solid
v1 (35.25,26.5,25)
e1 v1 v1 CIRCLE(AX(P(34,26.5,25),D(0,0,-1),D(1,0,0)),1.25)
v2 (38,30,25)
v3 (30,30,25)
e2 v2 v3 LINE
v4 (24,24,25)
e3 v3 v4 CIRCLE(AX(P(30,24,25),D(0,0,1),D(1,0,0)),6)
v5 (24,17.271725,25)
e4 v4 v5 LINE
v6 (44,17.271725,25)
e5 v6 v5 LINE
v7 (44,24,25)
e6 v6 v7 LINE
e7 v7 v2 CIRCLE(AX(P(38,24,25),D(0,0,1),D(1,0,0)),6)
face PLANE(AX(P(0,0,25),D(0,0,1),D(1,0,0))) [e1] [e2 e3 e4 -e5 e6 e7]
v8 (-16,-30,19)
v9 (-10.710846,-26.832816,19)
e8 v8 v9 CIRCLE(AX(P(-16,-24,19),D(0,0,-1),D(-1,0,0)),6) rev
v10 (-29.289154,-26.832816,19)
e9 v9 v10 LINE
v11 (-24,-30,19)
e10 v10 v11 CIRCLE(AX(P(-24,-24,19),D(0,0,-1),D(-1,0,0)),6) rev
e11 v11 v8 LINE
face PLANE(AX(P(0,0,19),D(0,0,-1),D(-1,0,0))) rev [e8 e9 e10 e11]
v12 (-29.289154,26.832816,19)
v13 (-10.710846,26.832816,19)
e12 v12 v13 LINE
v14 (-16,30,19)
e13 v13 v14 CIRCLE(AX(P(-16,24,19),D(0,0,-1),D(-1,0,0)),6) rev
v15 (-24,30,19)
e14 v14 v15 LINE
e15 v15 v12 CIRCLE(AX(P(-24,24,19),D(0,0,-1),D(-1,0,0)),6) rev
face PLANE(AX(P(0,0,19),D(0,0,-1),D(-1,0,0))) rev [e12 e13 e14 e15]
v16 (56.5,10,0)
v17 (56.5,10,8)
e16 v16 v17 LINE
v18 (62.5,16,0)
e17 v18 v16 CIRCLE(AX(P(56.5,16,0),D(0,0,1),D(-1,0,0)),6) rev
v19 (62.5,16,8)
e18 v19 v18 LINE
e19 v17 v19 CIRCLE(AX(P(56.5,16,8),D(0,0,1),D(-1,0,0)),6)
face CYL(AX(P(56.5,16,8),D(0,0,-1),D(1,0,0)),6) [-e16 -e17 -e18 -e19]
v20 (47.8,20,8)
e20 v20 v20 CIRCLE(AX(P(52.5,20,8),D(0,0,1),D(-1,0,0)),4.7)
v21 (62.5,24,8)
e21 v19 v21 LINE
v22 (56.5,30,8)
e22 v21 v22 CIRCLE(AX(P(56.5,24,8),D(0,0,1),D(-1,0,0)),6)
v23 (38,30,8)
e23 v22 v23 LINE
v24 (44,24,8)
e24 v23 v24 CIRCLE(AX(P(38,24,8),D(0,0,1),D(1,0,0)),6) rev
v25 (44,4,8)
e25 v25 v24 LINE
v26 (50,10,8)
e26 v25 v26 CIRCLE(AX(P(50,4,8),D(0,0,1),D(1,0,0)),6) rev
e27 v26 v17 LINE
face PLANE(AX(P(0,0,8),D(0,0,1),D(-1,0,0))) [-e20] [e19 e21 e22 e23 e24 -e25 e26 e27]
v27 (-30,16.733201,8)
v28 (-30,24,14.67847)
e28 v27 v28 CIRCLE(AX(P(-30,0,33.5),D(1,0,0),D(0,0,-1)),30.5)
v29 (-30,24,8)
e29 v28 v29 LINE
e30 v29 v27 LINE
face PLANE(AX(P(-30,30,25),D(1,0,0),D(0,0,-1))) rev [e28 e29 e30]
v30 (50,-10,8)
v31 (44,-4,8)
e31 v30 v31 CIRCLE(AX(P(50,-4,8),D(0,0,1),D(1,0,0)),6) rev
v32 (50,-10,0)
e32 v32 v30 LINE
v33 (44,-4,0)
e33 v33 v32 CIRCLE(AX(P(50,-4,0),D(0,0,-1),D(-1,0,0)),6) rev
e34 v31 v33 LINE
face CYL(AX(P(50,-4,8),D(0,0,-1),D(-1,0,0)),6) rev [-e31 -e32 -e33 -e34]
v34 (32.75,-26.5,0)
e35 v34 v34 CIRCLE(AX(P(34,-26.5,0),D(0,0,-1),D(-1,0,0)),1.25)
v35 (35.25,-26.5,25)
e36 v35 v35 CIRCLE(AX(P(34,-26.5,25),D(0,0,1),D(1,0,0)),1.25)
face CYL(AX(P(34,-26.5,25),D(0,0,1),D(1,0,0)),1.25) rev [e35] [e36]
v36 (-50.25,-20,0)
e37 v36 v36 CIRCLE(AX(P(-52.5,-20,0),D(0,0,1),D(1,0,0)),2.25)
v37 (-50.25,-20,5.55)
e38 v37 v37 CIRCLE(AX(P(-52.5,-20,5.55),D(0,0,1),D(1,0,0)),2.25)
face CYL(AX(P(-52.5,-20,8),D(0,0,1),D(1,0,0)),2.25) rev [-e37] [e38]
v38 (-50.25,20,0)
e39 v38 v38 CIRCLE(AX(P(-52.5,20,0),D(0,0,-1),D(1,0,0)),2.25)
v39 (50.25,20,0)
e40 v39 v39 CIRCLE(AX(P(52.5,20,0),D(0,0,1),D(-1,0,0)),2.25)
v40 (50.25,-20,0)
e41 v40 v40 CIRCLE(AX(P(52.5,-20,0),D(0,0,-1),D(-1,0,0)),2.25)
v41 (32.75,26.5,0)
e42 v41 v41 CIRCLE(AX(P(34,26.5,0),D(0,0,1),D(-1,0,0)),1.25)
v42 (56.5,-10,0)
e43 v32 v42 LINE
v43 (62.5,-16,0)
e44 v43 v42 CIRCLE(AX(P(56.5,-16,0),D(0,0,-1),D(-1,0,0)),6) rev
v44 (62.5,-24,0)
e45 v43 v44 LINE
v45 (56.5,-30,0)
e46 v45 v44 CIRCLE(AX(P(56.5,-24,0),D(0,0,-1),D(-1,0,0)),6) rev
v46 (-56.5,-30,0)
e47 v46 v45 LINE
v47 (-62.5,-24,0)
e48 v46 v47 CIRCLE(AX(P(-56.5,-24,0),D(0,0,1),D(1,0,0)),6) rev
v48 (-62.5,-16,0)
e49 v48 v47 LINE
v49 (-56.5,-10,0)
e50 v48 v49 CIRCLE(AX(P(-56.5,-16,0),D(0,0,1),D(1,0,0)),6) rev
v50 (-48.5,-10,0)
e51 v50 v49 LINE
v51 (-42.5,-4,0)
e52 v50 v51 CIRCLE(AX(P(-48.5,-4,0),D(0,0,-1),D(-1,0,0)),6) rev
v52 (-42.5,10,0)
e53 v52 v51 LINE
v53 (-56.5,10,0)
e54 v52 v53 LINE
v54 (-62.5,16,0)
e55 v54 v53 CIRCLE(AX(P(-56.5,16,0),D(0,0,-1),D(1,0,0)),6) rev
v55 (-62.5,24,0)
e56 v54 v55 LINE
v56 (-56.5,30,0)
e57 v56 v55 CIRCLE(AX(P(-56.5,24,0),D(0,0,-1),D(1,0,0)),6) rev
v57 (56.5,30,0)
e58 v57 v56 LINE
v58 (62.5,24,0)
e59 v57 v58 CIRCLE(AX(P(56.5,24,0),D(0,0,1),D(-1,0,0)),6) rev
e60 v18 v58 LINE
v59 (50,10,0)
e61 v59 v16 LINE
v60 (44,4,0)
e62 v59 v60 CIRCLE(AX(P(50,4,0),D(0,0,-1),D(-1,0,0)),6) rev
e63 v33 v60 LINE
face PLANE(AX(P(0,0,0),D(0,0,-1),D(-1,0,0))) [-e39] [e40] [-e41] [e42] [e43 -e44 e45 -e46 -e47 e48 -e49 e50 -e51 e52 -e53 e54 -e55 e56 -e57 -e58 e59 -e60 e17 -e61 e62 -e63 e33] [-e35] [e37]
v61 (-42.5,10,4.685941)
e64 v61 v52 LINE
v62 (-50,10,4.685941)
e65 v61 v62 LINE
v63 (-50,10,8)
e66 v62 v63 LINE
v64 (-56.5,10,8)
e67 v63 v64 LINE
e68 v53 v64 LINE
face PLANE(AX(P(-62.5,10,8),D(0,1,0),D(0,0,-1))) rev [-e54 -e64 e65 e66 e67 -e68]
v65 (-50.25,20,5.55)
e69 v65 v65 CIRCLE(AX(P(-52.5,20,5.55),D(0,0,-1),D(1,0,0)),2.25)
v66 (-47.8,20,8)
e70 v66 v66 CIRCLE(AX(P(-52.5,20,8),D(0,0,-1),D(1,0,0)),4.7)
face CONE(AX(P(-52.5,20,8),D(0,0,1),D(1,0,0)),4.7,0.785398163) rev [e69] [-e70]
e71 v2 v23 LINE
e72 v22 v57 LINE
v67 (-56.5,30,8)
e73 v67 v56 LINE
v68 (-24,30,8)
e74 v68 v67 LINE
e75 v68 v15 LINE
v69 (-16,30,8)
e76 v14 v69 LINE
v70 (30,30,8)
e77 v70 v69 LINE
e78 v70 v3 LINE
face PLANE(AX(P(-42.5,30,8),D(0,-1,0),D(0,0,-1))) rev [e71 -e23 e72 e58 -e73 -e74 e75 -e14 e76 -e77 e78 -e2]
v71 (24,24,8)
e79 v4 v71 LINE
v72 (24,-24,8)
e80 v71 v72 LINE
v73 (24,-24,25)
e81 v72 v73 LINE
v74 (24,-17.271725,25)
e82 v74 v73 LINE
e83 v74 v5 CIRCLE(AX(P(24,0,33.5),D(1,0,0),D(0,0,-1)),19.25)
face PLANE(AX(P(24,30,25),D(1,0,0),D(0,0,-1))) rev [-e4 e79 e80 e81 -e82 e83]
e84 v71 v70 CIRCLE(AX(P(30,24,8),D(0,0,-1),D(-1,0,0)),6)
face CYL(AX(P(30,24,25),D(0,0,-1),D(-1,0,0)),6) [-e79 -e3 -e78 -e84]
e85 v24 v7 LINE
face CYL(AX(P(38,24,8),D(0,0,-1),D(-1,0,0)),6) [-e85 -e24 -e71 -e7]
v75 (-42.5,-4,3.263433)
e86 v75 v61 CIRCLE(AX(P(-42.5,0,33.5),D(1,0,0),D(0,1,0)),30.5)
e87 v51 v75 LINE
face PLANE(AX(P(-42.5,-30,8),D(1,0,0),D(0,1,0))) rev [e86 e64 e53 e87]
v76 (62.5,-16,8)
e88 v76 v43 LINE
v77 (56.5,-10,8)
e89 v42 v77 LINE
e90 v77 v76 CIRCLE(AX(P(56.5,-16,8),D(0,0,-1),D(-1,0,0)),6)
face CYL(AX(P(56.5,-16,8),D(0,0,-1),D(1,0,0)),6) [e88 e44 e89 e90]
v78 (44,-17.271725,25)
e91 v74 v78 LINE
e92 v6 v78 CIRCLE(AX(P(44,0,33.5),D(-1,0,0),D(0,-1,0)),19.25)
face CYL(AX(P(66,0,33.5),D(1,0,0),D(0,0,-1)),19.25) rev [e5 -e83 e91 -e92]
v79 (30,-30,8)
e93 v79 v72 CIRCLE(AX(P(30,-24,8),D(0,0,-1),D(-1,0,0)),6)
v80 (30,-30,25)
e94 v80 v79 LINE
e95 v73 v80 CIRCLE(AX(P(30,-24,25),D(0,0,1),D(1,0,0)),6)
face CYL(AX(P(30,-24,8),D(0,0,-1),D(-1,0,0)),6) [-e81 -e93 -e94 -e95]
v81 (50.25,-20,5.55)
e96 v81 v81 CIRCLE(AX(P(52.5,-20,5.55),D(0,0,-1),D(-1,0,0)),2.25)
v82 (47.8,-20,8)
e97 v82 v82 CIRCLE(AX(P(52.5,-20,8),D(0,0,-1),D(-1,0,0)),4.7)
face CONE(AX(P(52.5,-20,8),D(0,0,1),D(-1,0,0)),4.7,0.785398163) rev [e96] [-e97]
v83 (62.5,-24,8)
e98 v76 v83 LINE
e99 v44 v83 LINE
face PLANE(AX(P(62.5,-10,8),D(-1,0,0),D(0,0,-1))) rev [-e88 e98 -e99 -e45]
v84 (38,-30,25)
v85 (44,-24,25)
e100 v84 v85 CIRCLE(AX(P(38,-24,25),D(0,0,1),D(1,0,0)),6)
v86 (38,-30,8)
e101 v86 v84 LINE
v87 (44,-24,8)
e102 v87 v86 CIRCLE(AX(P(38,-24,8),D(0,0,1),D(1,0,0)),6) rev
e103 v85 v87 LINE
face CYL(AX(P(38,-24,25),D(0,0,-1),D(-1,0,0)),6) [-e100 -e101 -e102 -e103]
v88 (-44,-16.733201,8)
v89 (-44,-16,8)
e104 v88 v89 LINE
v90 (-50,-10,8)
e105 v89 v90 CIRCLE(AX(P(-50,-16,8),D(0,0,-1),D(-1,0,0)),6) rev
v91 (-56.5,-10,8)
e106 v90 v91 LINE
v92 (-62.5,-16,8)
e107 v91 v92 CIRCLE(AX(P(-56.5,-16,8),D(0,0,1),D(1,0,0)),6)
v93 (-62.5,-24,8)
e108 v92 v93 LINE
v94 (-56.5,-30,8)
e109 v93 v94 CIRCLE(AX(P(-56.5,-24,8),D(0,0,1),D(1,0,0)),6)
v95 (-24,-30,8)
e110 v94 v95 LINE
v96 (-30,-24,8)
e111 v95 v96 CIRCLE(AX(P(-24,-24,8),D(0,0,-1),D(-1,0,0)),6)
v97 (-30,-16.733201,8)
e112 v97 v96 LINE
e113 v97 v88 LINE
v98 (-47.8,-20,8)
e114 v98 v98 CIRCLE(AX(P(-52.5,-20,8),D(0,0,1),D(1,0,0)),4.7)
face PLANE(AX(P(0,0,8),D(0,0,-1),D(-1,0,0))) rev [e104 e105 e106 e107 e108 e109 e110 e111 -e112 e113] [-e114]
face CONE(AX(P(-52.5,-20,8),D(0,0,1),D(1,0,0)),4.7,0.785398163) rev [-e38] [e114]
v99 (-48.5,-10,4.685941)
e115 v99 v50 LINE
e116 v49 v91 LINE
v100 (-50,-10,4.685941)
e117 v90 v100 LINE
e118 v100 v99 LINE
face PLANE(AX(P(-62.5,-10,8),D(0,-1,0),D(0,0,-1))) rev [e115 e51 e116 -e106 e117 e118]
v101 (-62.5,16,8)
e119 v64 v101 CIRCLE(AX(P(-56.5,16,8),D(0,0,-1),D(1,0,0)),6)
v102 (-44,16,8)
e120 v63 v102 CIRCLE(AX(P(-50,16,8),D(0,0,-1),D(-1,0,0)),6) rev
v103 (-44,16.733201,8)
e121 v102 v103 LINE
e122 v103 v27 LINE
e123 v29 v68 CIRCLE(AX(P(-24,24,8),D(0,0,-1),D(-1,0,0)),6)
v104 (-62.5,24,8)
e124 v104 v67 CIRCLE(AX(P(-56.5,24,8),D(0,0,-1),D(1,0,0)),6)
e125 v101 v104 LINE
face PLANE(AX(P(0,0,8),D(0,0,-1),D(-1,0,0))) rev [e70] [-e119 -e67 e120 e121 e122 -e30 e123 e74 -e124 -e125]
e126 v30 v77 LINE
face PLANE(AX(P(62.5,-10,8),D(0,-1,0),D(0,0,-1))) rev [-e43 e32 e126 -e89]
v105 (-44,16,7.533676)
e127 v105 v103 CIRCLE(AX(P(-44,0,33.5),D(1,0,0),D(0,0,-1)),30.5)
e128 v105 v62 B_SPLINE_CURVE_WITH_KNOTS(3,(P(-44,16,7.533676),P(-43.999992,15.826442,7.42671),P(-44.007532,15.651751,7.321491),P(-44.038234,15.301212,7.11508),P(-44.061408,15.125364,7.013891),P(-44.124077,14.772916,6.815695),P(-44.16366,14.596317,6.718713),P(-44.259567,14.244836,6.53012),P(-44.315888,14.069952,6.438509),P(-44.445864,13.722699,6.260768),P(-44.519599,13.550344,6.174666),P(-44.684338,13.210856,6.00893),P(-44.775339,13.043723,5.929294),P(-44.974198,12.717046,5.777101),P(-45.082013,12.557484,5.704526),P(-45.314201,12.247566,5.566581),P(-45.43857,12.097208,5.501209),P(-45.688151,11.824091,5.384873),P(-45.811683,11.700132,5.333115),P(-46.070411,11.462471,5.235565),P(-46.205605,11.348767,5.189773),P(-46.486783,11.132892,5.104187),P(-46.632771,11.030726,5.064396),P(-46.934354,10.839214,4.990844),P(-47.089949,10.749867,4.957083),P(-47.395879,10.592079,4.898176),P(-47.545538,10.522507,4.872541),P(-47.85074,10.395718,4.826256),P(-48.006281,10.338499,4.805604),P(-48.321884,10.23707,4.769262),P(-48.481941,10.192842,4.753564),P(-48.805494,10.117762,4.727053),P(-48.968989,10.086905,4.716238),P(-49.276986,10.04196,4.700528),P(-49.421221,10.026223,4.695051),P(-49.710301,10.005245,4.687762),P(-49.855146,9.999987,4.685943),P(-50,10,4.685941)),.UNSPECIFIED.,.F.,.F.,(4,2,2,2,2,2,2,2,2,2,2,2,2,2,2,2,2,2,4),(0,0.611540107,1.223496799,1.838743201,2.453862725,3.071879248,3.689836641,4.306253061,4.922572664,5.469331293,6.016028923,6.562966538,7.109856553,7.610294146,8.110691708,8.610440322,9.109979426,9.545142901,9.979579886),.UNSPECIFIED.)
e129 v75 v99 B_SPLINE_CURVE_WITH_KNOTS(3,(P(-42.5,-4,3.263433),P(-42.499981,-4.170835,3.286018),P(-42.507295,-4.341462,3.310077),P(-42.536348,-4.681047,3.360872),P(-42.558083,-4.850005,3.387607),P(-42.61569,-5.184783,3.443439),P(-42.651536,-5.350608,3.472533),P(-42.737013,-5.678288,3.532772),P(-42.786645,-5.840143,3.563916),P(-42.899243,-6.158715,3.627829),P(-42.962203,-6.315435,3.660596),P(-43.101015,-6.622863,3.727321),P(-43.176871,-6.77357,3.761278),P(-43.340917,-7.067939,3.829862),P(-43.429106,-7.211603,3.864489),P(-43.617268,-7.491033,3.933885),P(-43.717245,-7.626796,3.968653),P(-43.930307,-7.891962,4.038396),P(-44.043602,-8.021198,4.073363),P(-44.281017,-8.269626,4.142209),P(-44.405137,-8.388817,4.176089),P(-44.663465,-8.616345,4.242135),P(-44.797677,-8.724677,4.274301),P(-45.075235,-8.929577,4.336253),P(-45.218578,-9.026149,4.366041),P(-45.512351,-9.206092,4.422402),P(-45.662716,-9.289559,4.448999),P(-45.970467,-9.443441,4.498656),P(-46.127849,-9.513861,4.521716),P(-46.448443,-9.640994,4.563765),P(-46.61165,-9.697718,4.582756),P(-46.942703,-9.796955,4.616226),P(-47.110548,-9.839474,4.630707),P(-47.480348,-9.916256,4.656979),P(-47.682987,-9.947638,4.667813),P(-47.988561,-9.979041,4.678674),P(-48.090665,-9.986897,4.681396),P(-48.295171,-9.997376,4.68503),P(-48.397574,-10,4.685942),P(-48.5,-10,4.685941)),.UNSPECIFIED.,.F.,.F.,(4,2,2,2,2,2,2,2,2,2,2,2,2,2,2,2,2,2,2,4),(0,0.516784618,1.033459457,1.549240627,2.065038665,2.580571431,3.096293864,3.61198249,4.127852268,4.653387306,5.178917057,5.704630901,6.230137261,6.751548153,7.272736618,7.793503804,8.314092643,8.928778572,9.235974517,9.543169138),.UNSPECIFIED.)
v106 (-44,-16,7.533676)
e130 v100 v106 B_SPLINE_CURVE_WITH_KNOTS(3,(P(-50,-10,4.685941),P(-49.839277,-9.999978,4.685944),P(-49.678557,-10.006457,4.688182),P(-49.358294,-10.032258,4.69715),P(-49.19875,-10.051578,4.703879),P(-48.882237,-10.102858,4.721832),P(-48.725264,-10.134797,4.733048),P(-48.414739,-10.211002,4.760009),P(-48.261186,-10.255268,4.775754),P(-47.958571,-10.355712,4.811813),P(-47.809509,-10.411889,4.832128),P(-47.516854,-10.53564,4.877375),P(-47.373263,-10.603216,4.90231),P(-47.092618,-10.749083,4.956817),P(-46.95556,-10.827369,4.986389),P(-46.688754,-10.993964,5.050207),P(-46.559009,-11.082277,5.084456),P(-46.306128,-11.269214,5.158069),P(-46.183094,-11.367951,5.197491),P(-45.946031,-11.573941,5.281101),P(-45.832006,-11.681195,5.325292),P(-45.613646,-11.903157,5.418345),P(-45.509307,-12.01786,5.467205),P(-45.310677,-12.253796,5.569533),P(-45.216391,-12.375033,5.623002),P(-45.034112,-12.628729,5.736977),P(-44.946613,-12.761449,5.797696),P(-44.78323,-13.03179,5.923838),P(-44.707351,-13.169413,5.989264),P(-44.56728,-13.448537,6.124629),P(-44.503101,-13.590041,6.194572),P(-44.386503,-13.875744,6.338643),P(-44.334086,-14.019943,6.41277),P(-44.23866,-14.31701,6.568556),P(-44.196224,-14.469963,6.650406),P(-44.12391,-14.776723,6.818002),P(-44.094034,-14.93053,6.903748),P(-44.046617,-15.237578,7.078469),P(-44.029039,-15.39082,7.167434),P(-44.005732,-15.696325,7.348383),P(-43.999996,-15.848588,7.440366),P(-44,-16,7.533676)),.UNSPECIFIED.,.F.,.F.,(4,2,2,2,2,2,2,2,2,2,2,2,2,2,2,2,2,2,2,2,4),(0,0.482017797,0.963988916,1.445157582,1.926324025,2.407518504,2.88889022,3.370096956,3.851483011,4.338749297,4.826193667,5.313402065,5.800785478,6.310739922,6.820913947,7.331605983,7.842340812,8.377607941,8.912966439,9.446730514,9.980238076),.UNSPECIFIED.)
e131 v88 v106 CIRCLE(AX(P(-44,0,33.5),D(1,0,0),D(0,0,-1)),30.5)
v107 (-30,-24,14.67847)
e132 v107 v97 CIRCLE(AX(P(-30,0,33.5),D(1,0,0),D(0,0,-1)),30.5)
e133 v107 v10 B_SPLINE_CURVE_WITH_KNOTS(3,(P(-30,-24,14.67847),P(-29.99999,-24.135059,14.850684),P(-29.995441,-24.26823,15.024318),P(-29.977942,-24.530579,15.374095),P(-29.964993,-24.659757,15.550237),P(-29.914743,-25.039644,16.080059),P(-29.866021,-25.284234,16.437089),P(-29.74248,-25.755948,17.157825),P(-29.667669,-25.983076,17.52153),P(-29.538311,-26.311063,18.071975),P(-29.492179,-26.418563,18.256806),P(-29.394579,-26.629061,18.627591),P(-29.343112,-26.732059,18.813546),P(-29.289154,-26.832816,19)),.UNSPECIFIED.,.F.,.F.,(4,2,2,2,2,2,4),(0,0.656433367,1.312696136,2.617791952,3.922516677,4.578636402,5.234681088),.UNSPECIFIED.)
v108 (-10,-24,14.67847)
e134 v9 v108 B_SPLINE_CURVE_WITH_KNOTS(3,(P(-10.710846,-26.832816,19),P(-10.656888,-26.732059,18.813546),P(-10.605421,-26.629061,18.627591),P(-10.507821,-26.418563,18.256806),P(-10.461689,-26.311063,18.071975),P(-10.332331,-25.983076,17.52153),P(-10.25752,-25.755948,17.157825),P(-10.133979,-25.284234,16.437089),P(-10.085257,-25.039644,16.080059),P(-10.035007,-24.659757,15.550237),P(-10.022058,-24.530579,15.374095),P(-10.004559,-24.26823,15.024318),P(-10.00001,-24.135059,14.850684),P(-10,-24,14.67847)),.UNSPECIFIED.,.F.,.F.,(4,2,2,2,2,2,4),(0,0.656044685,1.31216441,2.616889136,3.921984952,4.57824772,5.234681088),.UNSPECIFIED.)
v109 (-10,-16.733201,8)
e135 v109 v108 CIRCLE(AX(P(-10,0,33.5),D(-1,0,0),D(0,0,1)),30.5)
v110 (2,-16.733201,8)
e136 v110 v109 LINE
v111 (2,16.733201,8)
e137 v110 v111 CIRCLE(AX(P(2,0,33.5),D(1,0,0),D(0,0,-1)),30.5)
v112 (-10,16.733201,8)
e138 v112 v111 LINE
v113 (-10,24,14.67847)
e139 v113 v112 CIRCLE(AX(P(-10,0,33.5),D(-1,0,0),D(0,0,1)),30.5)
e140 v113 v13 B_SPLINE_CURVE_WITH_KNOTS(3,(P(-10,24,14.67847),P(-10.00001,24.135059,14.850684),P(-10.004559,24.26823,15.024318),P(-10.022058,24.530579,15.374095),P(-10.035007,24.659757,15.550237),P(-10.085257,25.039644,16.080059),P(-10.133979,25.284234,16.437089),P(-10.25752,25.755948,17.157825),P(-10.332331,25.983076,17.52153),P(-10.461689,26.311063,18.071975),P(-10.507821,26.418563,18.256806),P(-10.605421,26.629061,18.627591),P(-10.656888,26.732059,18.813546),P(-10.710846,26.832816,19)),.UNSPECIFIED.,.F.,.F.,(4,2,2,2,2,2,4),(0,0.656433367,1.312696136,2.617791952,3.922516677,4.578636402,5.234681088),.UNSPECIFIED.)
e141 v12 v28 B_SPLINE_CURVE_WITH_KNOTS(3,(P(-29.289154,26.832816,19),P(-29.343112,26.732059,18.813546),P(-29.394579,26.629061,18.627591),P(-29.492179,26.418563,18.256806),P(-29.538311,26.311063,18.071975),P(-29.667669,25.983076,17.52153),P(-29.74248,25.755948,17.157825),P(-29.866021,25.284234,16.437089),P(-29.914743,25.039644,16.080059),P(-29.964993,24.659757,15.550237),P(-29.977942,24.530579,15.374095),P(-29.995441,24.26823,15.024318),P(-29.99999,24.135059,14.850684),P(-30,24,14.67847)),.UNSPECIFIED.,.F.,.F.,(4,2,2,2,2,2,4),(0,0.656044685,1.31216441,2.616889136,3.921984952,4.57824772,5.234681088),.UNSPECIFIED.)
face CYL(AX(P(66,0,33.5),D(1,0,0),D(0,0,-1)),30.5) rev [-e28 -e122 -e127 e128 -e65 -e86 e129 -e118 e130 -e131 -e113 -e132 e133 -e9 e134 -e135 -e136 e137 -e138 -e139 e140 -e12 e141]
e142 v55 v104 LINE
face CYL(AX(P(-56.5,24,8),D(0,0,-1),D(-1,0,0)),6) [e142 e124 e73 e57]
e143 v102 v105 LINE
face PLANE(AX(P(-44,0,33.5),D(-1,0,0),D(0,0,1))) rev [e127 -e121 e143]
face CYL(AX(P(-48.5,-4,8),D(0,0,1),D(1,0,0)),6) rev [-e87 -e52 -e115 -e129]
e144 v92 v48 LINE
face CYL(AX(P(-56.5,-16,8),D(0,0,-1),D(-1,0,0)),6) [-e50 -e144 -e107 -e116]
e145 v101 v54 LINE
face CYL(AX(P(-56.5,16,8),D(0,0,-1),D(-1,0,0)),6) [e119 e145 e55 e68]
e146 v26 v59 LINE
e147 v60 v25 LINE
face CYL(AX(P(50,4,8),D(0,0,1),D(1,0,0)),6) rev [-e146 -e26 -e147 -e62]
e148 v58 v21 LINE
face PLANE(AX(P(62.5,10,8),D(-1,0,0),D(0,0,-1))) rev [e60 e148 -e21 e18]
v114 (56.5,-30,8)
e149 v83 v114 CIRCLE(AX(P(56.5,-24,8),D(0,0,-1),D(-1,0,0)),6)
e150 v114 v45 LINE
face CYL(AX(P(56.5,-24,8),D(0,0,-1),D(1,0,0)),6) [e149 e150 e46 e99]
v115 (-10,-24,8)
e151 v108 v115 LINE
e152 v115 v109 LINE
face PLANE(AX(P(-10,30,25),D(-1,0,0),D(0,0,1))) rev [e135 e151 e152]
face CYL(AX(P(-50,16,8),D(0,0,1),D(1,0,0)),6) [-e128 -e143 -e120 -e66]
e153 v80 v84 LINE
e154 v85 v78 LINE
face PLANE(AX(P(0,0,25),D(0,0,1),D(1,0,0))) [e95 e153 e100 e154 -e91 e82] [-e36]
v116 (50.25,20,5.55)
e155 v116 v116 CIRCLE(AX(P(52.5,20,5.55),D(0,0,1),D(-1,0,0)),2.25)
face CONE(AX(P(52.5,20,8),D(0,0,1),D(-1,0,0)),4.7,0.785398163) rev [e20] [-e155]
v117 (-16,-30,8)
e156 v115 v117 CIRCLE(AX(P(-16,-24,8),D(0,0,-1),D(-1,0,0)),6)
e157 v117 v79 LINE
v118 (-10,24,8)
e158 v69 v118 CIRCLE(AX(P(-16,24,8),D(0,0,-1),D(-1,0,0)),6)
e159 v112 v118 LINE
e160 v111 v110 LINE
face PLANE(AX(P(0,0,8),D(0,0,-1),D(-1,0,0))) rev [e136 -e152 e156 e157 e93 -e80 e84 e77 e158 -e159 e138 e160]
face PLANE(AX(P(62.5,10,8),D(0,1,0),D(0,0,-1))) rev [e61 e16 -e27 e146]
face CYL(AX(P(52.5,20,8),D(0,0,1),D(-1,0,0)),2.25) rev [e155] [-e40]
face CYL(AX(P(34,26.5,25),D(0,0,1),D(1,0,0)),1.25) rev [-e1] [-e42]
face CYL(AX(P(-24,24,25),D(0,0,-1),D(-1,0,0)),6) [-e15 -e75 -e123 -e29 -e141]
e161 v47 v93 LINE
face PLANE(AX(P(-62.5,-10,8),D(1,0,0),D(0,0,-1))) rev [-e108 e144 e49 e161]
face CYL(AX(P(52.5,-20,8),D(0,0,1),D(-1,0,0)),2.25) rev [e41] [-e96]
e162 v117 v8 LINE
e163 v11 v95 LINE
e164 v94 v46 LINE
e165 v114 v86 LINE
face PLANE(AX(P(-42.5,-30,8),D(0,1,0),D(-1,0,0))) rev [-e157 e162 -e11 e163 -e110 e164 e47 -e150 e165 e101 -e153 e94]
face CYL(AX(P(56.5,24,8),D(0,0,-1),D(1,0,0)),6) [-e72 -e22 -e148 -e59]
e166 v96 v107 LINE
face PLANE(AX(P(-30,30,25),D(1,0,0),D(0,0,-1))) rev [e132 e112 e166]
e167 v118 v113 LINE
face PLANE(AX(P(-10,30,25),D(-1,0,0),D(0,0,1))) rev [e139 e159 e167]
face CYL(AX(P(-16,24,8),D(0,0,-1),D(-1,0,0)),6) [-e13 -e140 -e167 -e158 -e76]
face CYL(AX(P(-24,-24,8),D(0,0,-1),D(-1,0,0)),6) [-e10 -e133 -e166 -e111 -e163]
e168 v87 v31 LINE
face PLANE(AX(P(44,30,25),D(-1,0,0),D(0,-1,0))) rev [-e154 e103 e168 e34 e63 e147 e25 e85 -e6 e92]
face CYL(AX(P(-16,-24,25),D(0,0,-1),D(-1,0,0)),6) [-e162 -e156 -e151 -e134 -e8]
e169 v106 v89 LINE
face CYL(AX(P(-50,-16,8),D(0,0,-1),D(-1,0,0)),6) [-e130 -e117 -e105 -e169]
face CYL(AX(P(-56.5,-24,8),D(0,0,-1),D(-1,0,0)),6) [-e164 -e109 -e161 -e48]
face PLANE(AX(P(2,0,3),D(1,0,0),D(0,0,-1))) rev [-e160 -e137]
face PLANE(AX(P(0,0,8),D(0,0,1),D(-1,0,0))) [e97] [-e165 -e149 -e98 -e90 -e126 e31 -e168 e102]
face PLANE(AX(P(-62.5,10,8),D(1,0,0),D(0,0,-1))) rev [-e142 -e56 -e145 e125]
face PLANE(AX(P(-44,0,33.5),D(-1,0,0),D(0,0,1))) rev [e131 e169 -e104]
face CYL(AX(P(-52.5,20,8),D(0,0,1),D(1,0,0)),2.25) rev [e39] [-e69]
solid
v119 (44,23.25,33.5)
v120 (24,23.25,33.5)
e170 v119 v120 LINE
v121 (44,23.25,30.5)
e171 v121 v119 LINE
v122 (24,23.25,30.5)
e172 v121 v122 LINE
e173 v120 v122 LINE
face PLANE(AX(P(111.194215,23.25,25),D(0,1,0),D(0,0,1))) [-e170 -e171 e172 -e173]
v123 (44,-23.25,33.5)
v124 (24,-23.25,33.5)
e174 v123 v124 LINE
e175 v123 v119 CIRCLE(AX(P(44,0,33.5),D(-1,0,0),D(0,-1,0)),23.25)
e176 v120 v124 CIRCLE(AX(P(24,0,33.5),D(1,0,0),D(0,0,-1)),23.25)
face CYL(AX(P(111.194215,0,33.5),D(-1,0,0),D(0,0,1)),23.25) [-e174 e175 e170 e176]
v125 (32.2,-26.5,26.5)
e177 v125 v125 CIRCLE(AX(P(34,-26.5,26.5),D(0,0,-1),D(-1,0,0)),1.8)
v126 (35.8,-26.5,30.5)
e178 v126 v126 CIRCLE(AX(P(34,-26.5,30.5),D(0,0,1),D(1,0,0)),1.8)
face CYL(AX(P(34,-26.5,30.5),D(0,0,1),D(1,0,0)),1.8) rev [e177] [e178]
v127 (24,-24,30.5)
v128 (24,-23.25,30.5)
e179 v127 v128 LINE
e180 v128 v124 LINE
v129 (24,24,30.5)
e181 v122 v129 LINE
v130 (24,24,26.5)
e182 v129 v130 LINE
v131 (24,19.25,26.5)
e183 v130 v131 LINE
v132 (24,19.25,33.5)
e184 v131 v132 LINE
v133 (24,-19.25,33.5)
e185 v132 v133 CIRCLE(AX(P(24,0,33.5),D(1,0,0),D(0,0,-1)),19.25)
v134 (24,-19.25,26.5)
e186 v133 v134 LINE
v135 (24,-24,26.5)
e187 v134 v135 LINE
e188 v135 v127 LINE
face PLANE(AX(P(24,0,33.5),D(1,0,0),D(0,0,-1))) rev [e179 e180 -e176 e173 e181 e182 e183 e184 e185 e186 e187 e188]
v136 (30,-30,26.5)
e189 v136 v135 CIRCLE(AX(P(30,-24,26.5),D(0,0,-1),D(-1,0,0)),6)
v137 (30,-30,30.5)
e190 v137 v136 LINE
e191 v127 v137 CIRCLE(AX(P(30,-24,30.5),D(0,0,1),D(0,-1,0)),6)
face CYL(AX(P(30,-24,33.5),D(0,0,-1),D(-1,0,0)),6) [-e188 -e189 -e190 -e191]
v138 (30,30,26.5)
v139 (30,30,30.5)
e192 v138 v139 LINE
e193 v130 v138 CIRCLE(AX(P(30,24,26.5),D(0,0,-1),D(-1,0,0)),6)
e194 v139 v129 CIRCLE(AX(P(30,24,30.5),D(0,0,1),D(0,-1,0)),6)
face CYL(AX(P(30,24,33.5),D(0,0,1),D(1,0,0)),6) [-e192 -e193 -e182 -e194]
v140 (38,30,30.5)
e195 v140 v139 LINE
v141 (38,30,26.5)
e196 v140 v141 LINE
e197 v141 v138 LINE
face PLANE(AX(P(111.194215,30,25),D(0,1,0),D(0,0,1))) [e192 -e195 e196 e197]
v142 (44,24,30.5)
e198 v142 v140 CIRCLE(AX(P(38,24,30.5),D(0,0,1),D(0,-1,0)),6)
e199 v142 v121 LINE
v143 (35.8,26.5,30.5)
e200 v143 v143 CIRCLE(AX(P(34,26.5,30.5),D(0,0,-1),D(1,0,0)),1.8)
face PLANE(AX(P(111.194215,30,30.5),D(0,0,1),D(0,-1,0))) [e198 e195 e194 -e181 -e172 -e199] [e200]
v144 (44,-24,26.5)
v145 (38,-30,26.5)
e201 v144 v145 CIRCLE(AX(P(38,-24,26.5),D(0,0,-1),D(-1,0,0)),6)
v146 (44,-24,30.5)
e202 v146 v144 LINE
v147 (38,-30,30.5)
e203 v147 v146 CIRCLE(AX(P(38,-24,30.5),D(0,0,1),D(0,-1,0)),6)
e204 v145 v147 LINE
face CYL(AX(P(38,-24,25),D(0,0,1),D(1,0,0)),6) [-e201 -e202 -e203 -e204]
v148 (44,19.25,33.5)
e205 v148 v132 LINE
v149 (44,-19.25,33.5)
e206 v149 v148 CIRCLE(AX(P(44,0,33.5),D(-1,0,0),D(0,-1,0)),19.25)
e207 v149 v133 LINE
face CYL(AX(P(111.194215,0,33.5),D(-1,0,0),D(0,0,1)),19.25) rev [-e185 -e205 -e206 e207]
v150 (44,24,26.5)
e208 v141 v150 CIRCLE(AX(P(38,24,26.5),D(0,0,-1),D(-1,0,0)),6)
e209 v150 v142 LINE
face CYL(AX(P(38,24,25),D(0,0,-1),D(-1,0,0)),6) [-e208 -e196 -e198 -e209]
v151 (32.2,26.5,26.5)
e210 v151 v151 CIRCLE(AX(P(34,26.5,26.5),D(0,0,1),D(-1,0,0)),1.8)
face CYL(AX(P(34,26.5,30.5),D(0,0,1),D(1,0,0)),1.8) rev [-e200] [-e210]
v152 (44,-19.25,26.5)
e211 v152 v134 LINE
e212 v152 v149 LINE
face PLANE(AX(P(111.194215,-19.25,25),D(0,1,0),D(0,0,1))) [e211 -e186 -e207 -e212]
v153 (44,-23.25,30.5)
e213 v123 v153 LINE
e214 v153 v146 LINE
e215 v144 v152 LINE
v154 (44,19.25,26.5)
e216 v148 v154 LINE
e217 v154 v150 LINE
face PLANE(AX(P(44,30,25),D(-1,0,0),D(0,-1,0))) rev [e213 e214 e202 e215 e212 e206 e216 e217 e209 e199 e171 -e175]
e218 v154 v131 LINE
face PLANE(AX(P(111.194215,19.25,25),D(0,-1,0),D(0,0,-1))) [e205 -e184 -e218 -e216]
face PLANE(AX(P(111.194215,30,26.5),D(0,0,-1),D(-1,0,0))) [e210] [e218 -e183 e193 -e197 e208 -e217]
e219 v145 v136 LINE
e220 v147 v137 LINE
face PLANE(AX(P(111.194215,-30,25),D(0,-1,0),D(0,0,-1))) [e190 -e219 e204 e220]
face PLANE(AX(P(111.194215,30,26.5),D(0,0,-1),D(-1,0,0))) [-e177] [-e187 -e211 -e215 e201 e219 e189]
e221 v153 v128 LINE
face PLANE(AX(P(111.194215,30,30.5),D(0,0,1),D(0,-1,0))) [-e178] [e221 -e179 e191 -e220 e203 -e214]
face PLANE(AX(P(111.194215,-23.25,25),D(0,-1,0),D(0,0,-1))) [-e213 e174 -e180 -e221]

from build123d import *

# Parameters (mm, degrees)
BASE_SKETCH_W               = 85
BASE_SKETCH_H               = 60
BASE_EXTRUDE_DEPTH          = 8
CRADLE_SKETCH_W             = 20
CRADLE_SKETCH_H             = 60
CRADLE_EXTRUDE_DEPTH        = 25
MOUNTING_TAB_SKETCH_W       = 20
MOUNTING_TAB_SKETCH_H       = 20
MOUNTING_TAB_EXTRUDE_DEPTH  = 8
MOUNTING_TAB_FILLET_R       = 6
MOVE_START                  = 19
MOVE_FACE_OUTLINE_W         = 20
MOVE_FACE_OUTLINE_H         = 60
MOVE_FACE_DEPTH             = 6
CLAMP_THREADED_HOLE_D       = 2.5
MOTOR_START                 = 24
MOTOR_CLAMP_EXTRUDE_DEPTH   = 20
SKETCH9_W                   = 1.8
SKETCH9_H                   = 4
BASE_CORNER_FILLETS_R       = 6
BASE_INISDE_CORNER_FILLET_R = 6
CLAMP_CORNER_FILLETS_R      = 6


# Read off the part's stored shape, not the designer's step: Move Face
with BuildPart() as part:
    # Base Sketch → Base Extrude (new body)
    with BuildSketch(Plane.XY):
        Rectangle(BASE_SKETCH_W, BASE_SKETCH_H)
    extrude(amount=BASE_EXTRUDE_DEPTH)

    # Cradle Sketch → Cradle Extrude (add)
    with BuildSketch(Plane.XY):
        with Locations((-20, 0)):
            Rectangle(CRADLE_SKETCH_W, CRADLE_SKETCH_H)
        with Locations((34, 0)):
            Rectangle(CRADLE_SKETCH_W, CRADLE_SKETCH_H)
    extrude(amount=CRADLE_EXTRUDE_DEPTH)


with BuildPart() as body_2:
    # Mounting Tab Sketch → Mounting Tab Extrude (new body)
    with BuildSketch(Plane.XY):
        with Locations((-52.5, -20)):
            Rectangle(MOUNTING_TAB_SKETCH_W, MOUNTING_TAB_SKETCH_H)
    extrude(amount=MOUNTING_TAB_EXTRUDE_DEPTH)

    # Mounting Tab M4 CS Clearance Hole Profile Sketch → Mounting Tab M4 Counter Sink Clearance Hole (revolve, cut)
    with BuildSketch(Plane(origin=(-52.5, -20, 8), x_dir=(0, -1, 0), z_dir=(1, 0, 0))):
        Polygon((0, 0), (0, 8), (2.25, 8), (2.25, 2.45), (4.7, 0), align=None)
    revolve(axis=Axis((-52.5, -20, 14.35), (0, 0, -1)), mode=Mode.SUBTRACT)

    # Mounting Tab Fillet
    mounting_tab_fillet_edges = [body_2.edges().sort_by_distance(p)[0] for p in [
        (-62.5, -30, 4),
        (-62.5, -10, 4),
    ]]
    fillet(mounting_tab_fillet_edges, radius=MOUNTING_TAB_FILLET_R)


with BuildPart() as body_3:
    # Mounting Tab Mirror Lengthwise: mirrored copy
    add(body_2.part.mirror(Plane(origin=(0, 0, 0), x_dir=(0, 0, 1), z_dir=(1, 0, 0))))


with BuildPart() as body_4:
    # Mounting Tab Mirror Width: mirrored copy
    add(body_2.part.mirror(Plane.ZX))


with BuildPart() as body_5:
    # Mounting Tab Mirror Width 2: mirrored copy
    add(body_3.part.mirror(Plane.ZX))


with BuildPart() as part_1:
    add(part.part)

    # Base and Tabs Combine: union body 2, body 3, body 4, body 5
    add(body_2.part)
    add(body_3.part)
    add(body_4.part)
    add(body_5.part)

    # Pump and Motor Revolve Cut Sketch → Pump and Motor Revolve Cut (revolve, cut)
    with BuildSketch(Plane(origin=(0, 0, 0), x_dir=(1, 0, 0), z_dir=(0, 1, 0))):
        Polygon((-44, -33.5), (-44, -3), (2, -3), (2, -14.25), (66, -14.25), (66, -33.5), align=None)
    revolve(axis=Axis((66, 0, 33.5), (-1, 0, 0)), mode=Mode.SUBTRACT)

    # Move Face outline → Move Face (cut)
    with BuildSketch(Plane.XY.offset(MOVE_START)):
        with Locations((-20, 0)):
            Rectangle(MOVE_FACE_OUTLINE_W, MOVE_FACE_OUTLINE_H)
    extrude(amount=MOVE_FACE_DEPTH, mode=Mode.SUBTRACT)

    # Clamp Threaded Hole (through all)
    with Locations(Plane.XY.offset(25)):
        with Locations((34, -26.5)):
            clamp_threaded_hole = Hole(CLAMP_THREADED_HOLE_D / 2)


with BuildPart() as body_2_2:
    # Hold Down Bracket Sketch → Motor Clamp Extrude (new body)
    with BuildSketch(Plane(origin=(0, 0, 0), x_dir=(0, 0, -1), z_dir=(1, 0, 0)).offset(MOTOR_START)):
        with BuildLine():
            Line((-33.5, -23.25), (-30.5, -23.25))
            Line((-30.5, -23.25), (-30.5, -30))
            Line((-30.5, -30), (-26.5, -30))
            Line((-26.5, -30), (-26.5, -19.25))
            Line((-26.5, -19.25), (-33.5, -19.25))
            ThreePointArc((-33.5, -19.25), (-52.75, 0), (-33.5, 19.25))
            Line((-33.5, 19.25), (-26.5, 19.25))
            Line((-26.5, 19.25), (-26.5, 30))
            Line((-26.5, 30), (-30.5, 30))
            Line((-30.5, 30), (-30.5, 23.25))
            Line((-30.5, 23.25), (-33.5, 23.25))
            ThreePointArc((-33.5, 23.25), (-56.75, 0), (-33.5, -23.25))
        make_face()
    extrude(amount=MOTOR_CLAMP_EXTRUDE_DEPTH)

    # Sketch9 → Clamp Clearance Hole (revolve, cut)
    with BuildSketch(Plane(origin=(34, -26.5, 30.5), x_dir=(0, -1, 0), z_dir=(1, 0, 0))):
        with Locations((0.9, 2)):
            Rectangle(SKETCH9_W, SKETCH9_H)
    clamp_clearance_hole = revolve(axis=Axis((34, -26.5, 36.85), (0, 0, -1)), mode=Mode.SUBTRACT)


with BuildPart() as motor_clamp_screw_holes_mirror_tool:
    # Motor Clamp Screw Holes Mirror: Clamp Threaded Hole, Clamp Clearance Hole across plane
    add(clamp_threaded_hole.mirror(Plane.ZX))
    add(clamp_clearance_hole.mirror(Plane.ZX))


with BuildPart() as part_2:
    add(part_1.part)

    # Motor Clamp Screw Holes Mirror: cut by motor_clamp_screw_holes_mirror_tool
    add(motor_clamp_screw_holes_mirror_tool.part, mode=Mode.SUBTRACT)

    # Base Corner Fillets
    base_corner_fillets_edges = [part_2.edges().sort_by_distance(p)[0] for p in [
        (44, -10, 4),
        (-10, -30, 13.5),
        (-30, -30, 13.5),
        (-30, 30, 13.5),
        (-10, 30, 13.5),
        (44, -30, 16.5),
        (24, -30, 16.5),
        (24, 30, 16.5),
        (44, 30, 16.5),
        (-44, -10, 6.342970466),
        (44, 10, 4),
        (-44, 10, 6.342970466),
    ]]
    fillet(base_corner_fillets_edges, radius=BASE_CORNER_FILLETS_R)

    # Base Inisde Corner Fillet
    base_inisde_corner_fillet_edges = [part_2.edges().sort_by_distance(p)[0] for p in [
        (-42.5, -10, 2.342970466),
    ]]
    fillet(base_inisde_corner_fillet_edges, radius=BASE_INISDE_CORNER_FILLET_R)


with BuildPart() as body_2_2_1:
    add(body_2_2.part)

    # Motor Clamp Screw Holes Mirror: cut by motor_clamp_screw_holes_mirror_tool
    add(motor_clamp_screw_holes_mirror_tool.part, mode=Mode.SUBTRACT)

    # Clamp Corner Fillets
    clamp_corner_fillets_edges = [body_2_2_1.edges().sort_by_distance(p)[0] for p in [
        (24, -30, 28.5),
        (24, 30, 28.5),
        (44, 30, 28.5),
        (44, -30, 28.5),
    ]]
    fillet(clamp_corner_fillets_edges, radius=CLAMP_CORNER_FILLETS_R)


solid = Compound([part_2.part, body_2_2_1.part])
